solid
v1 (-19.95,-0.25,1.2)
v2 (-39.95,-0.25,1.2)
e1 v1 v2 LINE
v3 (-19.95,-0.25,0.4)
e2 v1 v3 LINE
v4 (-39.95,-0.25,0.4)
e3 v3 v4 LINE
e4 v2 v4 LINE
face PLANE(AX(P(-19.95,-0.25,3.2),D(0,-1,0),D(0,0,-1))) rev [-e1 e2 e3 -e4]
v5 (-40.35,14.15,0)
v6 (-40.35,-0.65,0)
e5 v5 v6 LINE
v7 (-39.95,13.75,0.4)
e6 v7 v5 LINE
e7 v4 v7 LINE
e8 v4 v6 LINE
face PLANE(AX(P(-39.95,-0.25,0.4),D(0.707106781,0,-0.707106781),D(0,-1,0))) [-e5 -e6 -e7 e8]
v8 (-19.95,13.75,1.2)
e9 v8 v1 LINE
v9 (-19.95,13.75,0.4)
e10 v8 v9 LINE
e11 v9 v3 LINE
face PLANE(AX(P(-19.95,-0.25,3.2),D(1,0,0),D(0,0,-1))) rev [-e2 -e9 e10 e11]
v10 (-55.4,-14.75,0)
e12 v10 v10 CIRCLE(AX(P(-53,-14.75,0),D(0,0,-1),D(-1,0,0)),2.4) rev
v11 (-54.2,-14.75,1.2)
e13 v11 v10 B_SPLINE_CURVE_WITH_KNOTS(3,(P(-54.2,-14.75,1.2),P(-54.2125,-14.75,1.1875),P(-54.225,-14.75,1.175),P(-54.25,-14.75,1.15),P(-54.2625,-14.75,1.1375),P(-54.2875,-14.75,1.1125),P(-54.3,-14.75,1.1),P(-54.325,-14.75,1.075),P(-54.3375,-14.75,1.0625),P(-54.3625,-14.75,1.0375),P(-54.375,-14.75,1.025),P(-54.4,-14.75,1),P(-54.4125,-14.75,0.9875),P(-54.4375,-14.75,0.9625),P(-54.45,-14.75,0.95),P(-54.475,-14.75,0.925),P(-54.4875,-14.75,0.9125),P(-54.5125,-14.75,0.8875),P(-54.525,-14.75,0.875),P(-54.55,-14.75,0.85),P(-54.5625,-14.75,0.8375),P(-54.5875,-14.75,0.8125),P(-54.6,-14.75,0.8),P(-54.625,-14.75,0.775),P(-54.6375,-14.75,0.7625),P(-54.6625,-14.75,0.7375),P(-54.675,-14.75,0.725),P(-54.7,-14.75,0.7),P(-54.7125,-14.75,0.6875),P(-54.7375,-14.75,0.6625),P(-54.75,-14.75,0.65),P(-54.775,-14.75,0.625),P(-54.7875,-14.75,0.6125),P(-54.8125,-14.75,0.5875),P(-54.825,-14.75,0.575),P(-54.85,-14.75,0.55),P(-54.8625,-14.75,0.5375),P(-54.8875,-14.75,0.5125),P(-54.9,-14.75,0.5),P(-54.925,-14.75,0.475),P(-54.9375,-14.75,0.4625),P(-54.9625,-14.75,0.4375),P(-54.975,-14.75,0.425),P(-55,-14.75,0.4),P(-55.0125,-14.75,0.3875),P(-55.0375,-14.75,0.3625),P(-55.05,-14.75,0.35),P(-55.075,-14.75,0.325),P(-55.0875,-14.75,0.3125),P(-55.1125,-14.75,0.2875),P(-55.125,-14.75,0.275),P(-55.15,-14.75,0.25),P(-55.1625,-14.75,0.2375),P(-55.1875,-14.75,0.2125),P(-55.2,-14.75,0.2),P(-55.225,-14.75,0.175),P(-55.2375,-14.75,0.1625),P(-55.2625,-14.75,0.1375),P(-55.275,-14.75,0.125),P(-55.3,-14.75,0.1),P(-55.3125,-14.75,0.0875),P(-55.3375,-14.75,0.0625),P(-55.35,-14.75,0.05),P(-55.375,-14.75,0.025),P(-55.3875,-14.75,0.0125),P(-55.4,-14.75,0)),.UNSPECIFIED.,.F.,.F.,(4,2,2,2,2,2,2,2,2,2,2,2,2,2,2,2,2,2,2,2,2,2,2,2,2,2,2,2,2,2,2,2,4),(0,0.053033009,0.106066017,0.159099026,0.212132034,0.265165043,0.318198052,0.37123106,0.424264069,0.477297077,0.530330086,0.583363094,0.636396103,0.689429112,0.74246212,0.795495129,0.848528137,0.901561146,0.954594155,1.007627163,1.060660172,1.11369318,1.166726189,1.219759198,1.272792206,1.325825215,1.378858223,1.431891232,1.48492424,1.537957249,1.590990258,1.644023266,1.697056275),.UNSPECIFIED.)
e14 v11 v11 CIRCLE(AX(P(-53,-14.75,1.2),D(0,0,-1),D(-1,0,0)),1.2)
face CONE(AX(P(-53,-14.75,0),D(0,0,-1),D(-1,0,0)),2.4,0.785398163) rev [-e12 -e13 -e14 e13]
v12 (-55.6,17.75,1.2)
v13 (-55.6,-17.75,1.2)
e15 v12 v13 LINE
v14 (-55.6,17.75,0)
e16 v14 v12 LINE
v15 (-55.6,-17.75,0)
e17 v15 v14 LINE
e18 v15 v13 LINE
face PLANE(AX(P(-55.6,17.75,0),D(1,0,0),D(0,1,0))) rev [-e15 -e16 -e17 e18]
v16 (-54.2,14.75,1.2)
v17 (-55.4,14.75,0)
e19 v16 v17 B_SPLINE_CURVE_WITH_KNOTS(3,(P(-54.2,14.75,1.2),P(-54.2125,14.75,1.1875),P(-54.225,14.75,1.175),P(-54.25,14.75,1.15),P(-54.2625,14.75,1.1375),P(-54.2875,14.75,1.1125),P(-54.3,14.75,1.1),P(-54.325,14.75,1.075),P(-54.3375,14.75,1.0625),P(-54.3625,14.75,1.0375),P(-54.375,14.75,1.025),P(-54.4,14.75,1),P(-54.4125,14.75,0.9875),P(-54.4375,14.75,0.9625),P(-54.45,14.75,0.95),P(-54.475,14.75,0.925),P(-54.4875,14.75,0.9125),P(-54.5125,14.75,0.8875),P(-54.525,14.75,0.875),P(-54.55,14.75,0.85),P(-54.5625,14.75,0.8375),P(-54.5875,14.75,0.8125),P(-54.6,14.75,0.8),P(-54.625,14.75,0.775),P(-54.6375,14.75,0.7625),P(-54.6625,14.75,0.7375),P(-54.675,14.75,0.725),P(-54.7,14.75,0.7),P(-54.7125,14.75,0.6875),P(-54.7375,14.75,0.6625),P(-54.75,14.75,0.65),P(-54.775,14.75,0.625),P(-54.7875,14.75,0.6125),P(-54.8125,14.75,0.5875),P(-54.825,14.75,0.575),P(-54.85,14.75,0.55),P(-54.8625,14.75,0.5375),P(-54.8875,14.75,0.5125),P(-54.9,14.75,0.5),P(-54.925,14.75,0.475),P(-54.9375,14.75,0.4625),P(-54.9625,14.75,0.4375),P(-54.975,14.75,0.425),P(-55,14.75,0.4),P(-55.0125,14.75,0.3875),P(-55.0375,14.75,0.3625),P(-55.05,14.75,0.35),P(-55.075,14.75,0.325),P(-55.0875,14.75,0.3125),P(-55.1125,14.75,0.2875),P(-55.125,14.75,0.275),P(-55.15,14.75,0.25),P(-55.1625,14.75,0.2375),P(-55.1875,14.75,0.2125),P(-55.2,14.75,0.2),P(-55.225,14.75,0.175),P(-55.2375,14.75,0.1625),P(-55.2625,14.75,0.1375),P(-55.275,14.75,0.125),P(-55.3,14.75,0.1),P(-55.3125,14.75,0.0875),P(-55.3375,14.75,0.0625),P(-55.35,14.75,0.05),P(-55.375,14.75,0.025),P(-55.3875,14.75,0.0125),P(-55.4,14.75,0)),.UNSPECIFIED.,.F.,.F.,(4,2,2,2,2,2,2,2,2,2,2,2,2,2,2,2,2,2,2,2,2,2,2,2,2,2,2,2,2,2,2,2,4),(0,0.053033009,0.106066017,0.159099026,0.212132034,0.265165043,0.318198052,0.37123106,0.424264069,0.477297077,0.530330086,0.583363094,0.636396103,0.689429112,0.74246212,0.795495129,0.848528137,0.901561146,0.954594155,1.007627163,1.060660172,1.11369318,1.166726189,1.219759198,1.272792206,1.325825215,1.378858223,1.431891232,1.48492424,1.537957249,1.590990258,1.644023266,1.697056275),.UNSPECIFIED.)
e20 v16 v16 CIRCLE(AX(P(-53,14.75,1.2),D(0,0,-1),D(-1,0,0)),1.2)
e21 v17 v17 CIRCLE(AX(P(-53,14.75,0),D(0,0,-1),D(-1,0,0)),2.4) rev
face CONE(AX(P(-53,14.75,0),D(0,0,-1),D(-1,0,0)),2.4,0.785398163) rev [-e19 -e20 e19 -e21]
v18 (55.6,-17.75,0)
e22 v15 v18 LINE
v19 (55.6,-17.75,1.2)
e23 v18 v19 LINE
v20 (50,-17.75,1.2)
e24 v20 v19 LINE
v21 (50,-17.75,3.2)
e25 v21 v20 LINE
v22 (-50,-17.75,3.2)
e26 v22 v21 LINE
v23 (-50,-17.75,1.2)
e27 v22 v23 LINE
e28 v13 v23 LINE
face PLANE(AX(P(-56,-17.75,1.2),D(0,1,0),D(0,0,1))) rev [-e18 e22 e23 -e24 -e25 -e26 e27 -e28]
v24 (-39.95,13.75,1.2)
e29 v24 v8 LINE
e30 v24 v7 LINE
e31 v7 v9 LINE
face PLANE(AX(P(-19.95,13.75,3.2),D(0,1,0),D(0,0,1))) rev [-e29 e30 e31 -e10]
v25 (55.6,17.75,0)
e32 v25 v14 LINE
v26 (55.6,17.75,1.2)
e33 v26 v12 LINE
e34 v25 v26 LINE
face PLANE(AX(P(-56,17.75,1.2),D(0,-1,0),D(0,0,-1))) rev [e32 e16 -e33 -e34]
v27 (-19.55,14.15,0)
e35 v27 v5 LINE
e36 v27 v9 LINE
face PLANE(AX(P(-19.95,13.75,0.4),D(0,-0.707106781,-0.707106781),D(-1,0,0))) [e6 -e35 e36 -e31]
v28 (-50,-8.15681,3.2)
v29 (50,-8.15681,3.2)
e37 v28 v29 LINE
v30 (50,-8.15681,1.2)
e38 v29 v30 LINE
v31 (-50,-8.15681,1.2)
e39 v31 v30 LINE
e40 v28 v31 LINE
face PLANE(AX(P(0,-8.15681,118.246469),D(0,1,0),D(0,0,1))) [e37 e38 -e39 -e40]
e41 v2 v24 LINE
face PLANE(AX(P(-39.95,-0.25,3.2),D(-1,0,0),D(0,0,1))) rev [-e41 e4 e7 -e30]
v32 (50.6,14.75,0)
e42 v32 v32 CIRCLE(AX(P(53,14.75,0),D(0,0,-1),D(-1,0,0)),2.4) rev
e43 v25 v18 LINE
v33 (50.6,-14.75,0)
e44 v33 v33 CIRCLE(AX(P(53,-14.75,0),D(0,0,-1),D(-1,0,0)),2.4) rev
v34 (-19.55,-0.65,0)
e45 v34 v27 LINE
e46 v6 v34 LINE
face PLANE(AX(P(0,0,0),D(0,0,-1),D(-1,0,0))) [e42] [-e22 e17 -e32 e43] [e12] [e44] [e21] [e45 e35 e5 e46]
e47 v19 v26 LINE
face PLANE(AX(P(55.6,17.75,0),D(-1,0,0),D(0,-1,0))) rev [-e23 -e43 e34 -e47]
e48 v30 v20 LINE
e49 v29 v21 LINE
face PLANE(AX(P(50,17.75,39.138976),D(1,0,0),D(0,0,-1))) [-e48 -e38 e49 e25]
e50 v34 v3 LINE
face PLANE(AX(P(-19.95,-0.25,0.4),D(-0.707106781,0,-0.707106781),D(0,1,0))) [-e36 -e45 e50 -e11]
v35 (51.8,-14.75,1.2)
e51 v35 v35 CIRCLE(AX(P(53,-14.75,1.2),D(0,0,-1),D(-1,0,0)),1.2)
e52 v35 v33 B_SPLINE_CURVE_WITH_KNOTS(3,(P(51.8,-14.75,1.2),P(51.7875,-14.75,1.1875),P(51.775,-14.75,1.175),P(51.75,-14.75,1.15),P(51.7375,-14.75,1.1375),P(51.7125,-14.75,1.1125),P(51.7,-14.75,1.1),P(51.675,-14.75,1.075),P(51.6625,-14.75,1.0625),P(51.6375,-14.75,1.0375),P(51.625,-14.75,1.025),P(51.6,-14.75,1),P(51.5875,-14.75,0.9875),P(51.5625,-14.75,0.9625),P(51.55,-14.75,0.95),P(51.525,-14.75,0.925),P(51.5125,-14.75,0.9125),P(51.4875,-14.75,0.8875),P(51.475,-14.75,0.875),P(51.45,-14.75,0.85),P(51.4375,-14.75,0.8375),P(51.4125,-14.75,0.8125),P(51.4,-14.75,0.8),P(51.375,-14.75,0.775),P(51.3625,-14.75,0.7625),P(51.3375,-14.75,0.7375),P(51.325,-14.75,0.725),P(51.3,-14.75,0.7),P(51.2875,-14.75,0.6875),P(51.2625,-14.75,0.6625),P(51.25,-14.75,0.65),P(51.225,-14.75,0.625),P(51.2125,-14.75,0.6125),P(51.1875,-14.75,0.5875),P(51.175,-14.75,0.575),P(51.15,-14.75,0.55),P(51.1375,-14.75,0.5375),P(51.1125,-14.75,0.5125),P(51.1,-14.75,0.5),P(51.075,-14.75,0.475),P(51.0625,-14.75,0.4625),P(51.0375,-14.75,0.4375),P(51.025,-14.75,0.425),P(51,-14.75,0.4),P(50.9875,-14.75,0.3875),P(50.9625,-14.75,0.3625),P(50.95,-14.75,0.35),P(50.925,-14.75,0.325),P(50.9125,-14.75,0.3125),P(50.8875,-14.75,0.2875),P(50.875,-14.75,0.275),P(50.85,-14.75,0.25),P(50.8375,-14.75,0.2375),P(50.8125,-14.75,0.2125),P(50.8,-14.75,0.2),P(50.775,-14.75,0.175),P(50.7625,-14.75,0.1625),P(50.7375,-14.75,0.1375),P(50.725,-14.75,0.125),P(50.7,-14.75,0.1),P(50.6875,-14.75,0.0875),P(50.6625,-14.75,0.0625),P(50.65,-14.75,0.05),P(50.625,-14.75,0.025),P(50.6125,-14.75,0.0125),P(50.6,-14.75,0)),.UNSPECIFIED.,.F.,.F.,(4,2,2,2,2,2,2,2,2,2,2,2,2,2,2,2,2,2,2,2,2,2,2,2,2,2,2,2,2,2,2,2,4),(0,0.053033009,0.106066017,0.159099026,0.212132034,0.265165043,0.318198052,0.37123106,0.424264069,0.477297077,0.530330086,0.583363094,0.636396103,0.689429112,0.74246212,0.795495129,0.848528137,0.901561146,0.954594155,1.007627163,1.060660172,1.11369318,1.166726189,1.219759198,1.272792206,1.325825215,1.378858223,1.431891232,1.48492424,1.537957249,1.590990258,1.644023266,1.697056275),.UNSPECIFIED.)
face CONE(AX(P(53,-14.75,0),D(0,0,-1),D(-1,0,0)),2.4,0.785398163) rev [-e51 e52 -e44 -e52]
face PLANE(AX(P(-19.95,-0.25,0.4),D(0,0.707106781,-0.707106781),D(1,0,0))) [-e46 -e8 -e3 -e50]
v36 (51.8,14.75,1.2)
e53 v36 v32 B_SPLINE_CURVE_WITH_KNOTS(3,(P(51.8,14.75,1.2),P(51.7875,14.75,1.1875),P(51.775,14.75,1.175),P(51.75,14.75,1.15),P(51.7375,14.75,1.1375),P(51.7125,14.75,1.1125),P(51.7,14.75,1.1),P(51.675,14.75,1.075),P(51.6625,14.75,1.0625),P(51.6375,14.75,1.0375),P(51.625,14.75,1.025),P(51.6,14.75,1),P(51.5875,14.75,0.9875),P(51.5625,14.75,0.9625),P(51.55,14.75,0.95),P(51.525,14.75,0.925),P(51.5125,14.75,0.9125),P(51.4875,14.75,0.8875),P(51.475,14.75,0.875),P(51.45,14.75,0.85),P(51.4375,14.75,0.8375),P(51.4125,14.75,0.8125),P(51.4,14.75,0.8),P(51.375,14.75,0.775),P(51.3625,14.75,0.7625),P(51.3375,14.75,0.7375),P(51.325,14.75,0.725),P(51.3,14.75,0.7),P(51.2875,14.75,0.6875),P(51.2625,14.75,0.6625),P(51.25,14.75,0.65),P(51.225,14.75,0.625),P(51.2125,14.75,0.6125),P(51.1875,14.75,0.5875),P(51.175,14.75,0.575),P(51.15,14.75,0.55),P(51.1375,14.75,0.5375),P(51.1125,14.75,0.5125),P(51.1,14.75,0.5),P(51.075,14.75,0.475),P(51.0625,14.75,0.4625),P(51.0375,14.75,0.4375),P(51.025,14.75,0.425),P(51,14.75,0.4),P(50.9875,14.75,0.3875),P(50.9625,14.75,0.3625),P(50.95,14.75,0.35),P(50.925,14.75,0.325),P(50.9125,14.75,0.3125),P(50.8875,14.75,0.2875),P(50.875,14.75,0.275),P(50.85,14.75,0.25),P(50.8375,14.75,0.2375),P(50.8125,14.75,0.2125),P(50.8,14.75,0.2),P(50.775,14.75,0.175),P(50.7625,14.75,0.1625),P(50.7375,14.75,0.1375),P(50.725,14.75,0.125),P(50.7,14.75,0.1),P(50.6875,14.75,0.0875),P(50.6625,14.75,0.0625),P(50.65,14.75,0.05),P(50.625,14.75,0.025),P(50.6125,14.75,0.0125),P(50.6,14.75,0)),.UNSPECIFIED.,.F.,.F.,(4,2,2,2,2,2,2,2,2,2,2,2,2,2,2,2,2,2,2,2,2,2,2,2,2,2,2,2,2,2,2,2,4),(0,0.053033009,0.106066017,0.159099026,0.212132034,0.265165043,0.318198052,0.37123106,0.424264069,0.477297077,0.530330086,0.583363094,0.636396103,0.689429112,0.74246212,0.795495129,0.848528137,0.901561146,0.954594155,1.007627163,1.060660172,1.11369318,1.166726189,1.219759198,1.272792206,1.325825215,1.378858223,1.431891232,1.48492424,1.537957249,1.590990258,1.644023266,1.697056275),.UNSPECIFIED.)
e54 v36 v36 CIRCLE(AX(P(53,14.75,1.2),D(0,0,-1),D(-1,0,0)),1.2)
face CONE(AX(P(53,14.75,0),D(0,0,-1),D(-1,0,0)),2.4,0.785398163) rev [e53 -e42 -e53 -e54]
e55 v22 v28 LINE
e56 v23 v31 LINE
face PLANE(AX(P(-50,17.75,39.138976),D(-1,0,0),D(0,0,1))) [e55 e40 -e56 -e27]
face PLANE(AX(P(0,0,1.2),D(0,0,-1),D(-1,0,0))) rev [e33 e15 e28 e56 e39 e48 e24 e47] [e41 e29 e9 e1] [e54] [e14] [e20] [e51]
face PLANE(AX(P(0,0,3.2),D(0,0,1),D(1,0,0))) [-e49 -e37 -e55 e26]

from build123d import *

# Parameters (mm, degrees)
SKETCH1_W                       = 112
SKETCH1_H                       = 35.5
BOSS_EXTRUDE1_DEPTH             = 1.2
SKETCH2_W                       = 6
SKETCH2_H                       = 6
BOSS_EXTRUDE2_DEPTH             = 2
SKETCH3_R                       = 1.1
CUT_EXTRUDE1_DEPTH              = 59.83283522
SKETCH5_W                       = 20
SKETCH5_H                       = 14
CUT_EXTRUDE3_DEPTH              = 59.83283522
CHAMFER1_SIZE                   = 0.4
CUT_EXTRUDE6_DEPTH              = 59.779779687
CUT_EXTRUDE6_DEPTH_BACK         = 59.779779687
SKETCH8_W                       = 0.4
SKETCH8_H                       = 35.5
SKIZZE1_W                       = 5.6
SKIZZE1_H                       = 23.5
AUFSATZ_LINEAR_AUSTRAGEN1_DEPTH = 2
SKETCH9_W                       = 5.6
SKETCH9_H                       = 35.5
CUT_EXTRUDE7_DEPTH              = 2
CHAMFER2_SIZE                   = 1.3


with BuildPart() as part:
    # Sketch1 → Boss-Extrude1 (new body)
    with BuildSketch(Plane.XY):
        Rectangle(SKETCH1_W, SKETCH1_H)
    extrude(amount=BOSS_EXTRUDE1_DEPTH)

    # Sketch2 → Boss-Extrude2 (add)
    with BuildSketch(Plane.XY.offset(1.2)):
        with Locations((-53, 14.75)):
            Rectangle(SKETCH2_W, SKETCH2_H)
        with Locations((-53, -14.75)):
            Rectangle(SKETCH2_W, SKETCH2_H)
        with Locations((53, -14.75)):
            Rectangle(SKETCH2_W, SKETCH2_H)
        with Locations((53, 14.75)):
            Rectangle(SKETCH2_W, SKETCH2_H)
    extrude(amount=BOSS_EXTRUDE2_DEPTH)

    # Sketch3 → Cut-Extrude1 (cut, through all)
    with BuildSketch(Plane.XY.offset(3.2)):
        with Locations((-53, 14.75)):
            Circle(SKETCH3_R)
        with Locations((-53, -14.75)):
            Circle(SKETCH3_R)
        with Locations((53, -14.75)):
            Circle(SKETCH3_R)
        with Locations((53, 14.75)):
            Circle(SKETCH3_R)
    extrude(amount=-CUT_EXTRUDE1_DEPTH, mode=Mode.SUBTRACT)

    # Sketch5 → Cut-Extrude3 (cut, through all)
    with BuildSketch(Plane(origin=(0, 0, 0), x_dir=(-1, 0, 0), z_dir=(0, 0, -1))):
        with Locations((29.95, 6.75)):
            Rectangle(SKETCH5_W, SKETCH5_H)
    extrude(amount=-CUT_EXTRUDE3_DEPTH, mode=Mode.SUBTRACT)

    # Chamfer1
    chamfer1_edges = [part.edges().sort_by_distance(p)[0] for p in [
        (-39.95, 6.75, 0),
        (-29.95, 13.75, 0),
        (-19.95, 6.75, 0),
        (-29.95, -0.25, 0),
    ]]
    chamfer(chamfer1_edges, length=CHAMFER1_SIZE)

    # Sketch8 → Cut-Extrude6 (cut, two sides: drawn at the far end of the back side and taken through both)
    with BuildSketch(Plane.XY.offset(1.2).offset(-CUT_EXTRUDE6_DEPTH_BACK)):
        with Locations((-55.8, 0)):
            Rectangle(SKETCH8_W, SKETCH8_H)
        with Locations((55.8, 0)):
            Rectangle(SKETCH8_W, SKETCH8_H)
    extrude(amount=CUT_EXTRUDE6_DEPTH + CUT_EXTRUDE6_DEPTH_BACK, mode=Mode.SUBTRACT)

    # Skizze1 → Aufsatz-Linear austragen1 (add)
    with BuildSketch(Plane.XY.offset(1.2)):
        Polygon((50, -8.156810447), (-50, -8.156810447), (-50, -11.75), (-50, -17.75), (50, -17.75), (50, -11.75), align=None)
        with Locations((-52.8, 0)):
            Rectangle(SKIZZE1_W, SKIZZE1_H)
        with Locations((52.8, 0)):
            Rectangle(SKIZZE1_W, SKIZZE1_H)
    extrude(amount=AUFSATZ_LINEAR_AUSTRAGEN1_DEPTH)

    # Sketch9 → Cut-Extrude7 (cut)
    with BuildSketch(Plane.XY.offset(1.2)):
        with Locations((-52.8, 0)):
            Rectangle(SKETCH9_W, SKETCH9_H)
        with Locations((52.8, 0)):
            Rectangle(SKETCH9_W, SKETCH9_H)
    extrude(amount=CUT_EXTRUDE7_DEPTH, mode=Mode.SUBTRACT)

    # Chamfer2
    # the kernel refuses this chamfer: 1.3 mm, written as the material it takes off along each edge
    with BuildSketch(Plane(origin=(-53, 14.75, 0), x_dir=(1, 0, 0), z_dir=(0, -1, 0))) as chamfer2_piece_1:
        Polygon((1.1 + CHAMFER2_SIZE, 0), (1.1, CHAMFER2_SIZE), (1.1, 0), align=None)
    revolve(axis=Axis((-53, 14.75, 0), (0, 0, 1)), mode=Mode.SUBTRACT)
    with BuildSketch(Plane(origin=(-53, -14.75, 0), x_dir=(1, 0, 0), z_dir=(0, -1, 0))) as chamfer2_piece_2:
        Polygon((1.1 + CHAMFER2_SIZE, 0), (1.1, CHAMFER2_SIZE), (1.1, 0), align=None)
    revolve(axis=Axis((-53, -14.75, 0), (0, 0, 1)), mode=Mode.SUBTRACT)
    with BuildSketch(Plane(origin=(53, -14.75, 0), x_dir=(1, 0, 0), z_dir=(0, -1, 0))) as chamfer2_piece_3:
        Polygon((1.1 + CHAMFER2_SIZE, 0), (1.1, CHAMFER2_SIZE), (1.1, 0), align=None)
    revolve(axis=Axis((53, -14.75, 0), (0, 0, 1)), mode=Mode.SUBTRACT)
    with BuildSketch(Plane(origin=(53, 14.75, 0), x_dir=(1, 0, 0), z_dir=(0, -1, 0))) as chamfer2_piece_4:
        Polygon((1.1 + CHAMFER2_SIZE, 0), (1.1, CHAMFER2_SIZE), (1.1, 0), align=None)
    revolve(axis=Axis((53, 14.75, 0), (0, 0, 1)), mode=Mode.SUBTRACT)


solid = part.part
